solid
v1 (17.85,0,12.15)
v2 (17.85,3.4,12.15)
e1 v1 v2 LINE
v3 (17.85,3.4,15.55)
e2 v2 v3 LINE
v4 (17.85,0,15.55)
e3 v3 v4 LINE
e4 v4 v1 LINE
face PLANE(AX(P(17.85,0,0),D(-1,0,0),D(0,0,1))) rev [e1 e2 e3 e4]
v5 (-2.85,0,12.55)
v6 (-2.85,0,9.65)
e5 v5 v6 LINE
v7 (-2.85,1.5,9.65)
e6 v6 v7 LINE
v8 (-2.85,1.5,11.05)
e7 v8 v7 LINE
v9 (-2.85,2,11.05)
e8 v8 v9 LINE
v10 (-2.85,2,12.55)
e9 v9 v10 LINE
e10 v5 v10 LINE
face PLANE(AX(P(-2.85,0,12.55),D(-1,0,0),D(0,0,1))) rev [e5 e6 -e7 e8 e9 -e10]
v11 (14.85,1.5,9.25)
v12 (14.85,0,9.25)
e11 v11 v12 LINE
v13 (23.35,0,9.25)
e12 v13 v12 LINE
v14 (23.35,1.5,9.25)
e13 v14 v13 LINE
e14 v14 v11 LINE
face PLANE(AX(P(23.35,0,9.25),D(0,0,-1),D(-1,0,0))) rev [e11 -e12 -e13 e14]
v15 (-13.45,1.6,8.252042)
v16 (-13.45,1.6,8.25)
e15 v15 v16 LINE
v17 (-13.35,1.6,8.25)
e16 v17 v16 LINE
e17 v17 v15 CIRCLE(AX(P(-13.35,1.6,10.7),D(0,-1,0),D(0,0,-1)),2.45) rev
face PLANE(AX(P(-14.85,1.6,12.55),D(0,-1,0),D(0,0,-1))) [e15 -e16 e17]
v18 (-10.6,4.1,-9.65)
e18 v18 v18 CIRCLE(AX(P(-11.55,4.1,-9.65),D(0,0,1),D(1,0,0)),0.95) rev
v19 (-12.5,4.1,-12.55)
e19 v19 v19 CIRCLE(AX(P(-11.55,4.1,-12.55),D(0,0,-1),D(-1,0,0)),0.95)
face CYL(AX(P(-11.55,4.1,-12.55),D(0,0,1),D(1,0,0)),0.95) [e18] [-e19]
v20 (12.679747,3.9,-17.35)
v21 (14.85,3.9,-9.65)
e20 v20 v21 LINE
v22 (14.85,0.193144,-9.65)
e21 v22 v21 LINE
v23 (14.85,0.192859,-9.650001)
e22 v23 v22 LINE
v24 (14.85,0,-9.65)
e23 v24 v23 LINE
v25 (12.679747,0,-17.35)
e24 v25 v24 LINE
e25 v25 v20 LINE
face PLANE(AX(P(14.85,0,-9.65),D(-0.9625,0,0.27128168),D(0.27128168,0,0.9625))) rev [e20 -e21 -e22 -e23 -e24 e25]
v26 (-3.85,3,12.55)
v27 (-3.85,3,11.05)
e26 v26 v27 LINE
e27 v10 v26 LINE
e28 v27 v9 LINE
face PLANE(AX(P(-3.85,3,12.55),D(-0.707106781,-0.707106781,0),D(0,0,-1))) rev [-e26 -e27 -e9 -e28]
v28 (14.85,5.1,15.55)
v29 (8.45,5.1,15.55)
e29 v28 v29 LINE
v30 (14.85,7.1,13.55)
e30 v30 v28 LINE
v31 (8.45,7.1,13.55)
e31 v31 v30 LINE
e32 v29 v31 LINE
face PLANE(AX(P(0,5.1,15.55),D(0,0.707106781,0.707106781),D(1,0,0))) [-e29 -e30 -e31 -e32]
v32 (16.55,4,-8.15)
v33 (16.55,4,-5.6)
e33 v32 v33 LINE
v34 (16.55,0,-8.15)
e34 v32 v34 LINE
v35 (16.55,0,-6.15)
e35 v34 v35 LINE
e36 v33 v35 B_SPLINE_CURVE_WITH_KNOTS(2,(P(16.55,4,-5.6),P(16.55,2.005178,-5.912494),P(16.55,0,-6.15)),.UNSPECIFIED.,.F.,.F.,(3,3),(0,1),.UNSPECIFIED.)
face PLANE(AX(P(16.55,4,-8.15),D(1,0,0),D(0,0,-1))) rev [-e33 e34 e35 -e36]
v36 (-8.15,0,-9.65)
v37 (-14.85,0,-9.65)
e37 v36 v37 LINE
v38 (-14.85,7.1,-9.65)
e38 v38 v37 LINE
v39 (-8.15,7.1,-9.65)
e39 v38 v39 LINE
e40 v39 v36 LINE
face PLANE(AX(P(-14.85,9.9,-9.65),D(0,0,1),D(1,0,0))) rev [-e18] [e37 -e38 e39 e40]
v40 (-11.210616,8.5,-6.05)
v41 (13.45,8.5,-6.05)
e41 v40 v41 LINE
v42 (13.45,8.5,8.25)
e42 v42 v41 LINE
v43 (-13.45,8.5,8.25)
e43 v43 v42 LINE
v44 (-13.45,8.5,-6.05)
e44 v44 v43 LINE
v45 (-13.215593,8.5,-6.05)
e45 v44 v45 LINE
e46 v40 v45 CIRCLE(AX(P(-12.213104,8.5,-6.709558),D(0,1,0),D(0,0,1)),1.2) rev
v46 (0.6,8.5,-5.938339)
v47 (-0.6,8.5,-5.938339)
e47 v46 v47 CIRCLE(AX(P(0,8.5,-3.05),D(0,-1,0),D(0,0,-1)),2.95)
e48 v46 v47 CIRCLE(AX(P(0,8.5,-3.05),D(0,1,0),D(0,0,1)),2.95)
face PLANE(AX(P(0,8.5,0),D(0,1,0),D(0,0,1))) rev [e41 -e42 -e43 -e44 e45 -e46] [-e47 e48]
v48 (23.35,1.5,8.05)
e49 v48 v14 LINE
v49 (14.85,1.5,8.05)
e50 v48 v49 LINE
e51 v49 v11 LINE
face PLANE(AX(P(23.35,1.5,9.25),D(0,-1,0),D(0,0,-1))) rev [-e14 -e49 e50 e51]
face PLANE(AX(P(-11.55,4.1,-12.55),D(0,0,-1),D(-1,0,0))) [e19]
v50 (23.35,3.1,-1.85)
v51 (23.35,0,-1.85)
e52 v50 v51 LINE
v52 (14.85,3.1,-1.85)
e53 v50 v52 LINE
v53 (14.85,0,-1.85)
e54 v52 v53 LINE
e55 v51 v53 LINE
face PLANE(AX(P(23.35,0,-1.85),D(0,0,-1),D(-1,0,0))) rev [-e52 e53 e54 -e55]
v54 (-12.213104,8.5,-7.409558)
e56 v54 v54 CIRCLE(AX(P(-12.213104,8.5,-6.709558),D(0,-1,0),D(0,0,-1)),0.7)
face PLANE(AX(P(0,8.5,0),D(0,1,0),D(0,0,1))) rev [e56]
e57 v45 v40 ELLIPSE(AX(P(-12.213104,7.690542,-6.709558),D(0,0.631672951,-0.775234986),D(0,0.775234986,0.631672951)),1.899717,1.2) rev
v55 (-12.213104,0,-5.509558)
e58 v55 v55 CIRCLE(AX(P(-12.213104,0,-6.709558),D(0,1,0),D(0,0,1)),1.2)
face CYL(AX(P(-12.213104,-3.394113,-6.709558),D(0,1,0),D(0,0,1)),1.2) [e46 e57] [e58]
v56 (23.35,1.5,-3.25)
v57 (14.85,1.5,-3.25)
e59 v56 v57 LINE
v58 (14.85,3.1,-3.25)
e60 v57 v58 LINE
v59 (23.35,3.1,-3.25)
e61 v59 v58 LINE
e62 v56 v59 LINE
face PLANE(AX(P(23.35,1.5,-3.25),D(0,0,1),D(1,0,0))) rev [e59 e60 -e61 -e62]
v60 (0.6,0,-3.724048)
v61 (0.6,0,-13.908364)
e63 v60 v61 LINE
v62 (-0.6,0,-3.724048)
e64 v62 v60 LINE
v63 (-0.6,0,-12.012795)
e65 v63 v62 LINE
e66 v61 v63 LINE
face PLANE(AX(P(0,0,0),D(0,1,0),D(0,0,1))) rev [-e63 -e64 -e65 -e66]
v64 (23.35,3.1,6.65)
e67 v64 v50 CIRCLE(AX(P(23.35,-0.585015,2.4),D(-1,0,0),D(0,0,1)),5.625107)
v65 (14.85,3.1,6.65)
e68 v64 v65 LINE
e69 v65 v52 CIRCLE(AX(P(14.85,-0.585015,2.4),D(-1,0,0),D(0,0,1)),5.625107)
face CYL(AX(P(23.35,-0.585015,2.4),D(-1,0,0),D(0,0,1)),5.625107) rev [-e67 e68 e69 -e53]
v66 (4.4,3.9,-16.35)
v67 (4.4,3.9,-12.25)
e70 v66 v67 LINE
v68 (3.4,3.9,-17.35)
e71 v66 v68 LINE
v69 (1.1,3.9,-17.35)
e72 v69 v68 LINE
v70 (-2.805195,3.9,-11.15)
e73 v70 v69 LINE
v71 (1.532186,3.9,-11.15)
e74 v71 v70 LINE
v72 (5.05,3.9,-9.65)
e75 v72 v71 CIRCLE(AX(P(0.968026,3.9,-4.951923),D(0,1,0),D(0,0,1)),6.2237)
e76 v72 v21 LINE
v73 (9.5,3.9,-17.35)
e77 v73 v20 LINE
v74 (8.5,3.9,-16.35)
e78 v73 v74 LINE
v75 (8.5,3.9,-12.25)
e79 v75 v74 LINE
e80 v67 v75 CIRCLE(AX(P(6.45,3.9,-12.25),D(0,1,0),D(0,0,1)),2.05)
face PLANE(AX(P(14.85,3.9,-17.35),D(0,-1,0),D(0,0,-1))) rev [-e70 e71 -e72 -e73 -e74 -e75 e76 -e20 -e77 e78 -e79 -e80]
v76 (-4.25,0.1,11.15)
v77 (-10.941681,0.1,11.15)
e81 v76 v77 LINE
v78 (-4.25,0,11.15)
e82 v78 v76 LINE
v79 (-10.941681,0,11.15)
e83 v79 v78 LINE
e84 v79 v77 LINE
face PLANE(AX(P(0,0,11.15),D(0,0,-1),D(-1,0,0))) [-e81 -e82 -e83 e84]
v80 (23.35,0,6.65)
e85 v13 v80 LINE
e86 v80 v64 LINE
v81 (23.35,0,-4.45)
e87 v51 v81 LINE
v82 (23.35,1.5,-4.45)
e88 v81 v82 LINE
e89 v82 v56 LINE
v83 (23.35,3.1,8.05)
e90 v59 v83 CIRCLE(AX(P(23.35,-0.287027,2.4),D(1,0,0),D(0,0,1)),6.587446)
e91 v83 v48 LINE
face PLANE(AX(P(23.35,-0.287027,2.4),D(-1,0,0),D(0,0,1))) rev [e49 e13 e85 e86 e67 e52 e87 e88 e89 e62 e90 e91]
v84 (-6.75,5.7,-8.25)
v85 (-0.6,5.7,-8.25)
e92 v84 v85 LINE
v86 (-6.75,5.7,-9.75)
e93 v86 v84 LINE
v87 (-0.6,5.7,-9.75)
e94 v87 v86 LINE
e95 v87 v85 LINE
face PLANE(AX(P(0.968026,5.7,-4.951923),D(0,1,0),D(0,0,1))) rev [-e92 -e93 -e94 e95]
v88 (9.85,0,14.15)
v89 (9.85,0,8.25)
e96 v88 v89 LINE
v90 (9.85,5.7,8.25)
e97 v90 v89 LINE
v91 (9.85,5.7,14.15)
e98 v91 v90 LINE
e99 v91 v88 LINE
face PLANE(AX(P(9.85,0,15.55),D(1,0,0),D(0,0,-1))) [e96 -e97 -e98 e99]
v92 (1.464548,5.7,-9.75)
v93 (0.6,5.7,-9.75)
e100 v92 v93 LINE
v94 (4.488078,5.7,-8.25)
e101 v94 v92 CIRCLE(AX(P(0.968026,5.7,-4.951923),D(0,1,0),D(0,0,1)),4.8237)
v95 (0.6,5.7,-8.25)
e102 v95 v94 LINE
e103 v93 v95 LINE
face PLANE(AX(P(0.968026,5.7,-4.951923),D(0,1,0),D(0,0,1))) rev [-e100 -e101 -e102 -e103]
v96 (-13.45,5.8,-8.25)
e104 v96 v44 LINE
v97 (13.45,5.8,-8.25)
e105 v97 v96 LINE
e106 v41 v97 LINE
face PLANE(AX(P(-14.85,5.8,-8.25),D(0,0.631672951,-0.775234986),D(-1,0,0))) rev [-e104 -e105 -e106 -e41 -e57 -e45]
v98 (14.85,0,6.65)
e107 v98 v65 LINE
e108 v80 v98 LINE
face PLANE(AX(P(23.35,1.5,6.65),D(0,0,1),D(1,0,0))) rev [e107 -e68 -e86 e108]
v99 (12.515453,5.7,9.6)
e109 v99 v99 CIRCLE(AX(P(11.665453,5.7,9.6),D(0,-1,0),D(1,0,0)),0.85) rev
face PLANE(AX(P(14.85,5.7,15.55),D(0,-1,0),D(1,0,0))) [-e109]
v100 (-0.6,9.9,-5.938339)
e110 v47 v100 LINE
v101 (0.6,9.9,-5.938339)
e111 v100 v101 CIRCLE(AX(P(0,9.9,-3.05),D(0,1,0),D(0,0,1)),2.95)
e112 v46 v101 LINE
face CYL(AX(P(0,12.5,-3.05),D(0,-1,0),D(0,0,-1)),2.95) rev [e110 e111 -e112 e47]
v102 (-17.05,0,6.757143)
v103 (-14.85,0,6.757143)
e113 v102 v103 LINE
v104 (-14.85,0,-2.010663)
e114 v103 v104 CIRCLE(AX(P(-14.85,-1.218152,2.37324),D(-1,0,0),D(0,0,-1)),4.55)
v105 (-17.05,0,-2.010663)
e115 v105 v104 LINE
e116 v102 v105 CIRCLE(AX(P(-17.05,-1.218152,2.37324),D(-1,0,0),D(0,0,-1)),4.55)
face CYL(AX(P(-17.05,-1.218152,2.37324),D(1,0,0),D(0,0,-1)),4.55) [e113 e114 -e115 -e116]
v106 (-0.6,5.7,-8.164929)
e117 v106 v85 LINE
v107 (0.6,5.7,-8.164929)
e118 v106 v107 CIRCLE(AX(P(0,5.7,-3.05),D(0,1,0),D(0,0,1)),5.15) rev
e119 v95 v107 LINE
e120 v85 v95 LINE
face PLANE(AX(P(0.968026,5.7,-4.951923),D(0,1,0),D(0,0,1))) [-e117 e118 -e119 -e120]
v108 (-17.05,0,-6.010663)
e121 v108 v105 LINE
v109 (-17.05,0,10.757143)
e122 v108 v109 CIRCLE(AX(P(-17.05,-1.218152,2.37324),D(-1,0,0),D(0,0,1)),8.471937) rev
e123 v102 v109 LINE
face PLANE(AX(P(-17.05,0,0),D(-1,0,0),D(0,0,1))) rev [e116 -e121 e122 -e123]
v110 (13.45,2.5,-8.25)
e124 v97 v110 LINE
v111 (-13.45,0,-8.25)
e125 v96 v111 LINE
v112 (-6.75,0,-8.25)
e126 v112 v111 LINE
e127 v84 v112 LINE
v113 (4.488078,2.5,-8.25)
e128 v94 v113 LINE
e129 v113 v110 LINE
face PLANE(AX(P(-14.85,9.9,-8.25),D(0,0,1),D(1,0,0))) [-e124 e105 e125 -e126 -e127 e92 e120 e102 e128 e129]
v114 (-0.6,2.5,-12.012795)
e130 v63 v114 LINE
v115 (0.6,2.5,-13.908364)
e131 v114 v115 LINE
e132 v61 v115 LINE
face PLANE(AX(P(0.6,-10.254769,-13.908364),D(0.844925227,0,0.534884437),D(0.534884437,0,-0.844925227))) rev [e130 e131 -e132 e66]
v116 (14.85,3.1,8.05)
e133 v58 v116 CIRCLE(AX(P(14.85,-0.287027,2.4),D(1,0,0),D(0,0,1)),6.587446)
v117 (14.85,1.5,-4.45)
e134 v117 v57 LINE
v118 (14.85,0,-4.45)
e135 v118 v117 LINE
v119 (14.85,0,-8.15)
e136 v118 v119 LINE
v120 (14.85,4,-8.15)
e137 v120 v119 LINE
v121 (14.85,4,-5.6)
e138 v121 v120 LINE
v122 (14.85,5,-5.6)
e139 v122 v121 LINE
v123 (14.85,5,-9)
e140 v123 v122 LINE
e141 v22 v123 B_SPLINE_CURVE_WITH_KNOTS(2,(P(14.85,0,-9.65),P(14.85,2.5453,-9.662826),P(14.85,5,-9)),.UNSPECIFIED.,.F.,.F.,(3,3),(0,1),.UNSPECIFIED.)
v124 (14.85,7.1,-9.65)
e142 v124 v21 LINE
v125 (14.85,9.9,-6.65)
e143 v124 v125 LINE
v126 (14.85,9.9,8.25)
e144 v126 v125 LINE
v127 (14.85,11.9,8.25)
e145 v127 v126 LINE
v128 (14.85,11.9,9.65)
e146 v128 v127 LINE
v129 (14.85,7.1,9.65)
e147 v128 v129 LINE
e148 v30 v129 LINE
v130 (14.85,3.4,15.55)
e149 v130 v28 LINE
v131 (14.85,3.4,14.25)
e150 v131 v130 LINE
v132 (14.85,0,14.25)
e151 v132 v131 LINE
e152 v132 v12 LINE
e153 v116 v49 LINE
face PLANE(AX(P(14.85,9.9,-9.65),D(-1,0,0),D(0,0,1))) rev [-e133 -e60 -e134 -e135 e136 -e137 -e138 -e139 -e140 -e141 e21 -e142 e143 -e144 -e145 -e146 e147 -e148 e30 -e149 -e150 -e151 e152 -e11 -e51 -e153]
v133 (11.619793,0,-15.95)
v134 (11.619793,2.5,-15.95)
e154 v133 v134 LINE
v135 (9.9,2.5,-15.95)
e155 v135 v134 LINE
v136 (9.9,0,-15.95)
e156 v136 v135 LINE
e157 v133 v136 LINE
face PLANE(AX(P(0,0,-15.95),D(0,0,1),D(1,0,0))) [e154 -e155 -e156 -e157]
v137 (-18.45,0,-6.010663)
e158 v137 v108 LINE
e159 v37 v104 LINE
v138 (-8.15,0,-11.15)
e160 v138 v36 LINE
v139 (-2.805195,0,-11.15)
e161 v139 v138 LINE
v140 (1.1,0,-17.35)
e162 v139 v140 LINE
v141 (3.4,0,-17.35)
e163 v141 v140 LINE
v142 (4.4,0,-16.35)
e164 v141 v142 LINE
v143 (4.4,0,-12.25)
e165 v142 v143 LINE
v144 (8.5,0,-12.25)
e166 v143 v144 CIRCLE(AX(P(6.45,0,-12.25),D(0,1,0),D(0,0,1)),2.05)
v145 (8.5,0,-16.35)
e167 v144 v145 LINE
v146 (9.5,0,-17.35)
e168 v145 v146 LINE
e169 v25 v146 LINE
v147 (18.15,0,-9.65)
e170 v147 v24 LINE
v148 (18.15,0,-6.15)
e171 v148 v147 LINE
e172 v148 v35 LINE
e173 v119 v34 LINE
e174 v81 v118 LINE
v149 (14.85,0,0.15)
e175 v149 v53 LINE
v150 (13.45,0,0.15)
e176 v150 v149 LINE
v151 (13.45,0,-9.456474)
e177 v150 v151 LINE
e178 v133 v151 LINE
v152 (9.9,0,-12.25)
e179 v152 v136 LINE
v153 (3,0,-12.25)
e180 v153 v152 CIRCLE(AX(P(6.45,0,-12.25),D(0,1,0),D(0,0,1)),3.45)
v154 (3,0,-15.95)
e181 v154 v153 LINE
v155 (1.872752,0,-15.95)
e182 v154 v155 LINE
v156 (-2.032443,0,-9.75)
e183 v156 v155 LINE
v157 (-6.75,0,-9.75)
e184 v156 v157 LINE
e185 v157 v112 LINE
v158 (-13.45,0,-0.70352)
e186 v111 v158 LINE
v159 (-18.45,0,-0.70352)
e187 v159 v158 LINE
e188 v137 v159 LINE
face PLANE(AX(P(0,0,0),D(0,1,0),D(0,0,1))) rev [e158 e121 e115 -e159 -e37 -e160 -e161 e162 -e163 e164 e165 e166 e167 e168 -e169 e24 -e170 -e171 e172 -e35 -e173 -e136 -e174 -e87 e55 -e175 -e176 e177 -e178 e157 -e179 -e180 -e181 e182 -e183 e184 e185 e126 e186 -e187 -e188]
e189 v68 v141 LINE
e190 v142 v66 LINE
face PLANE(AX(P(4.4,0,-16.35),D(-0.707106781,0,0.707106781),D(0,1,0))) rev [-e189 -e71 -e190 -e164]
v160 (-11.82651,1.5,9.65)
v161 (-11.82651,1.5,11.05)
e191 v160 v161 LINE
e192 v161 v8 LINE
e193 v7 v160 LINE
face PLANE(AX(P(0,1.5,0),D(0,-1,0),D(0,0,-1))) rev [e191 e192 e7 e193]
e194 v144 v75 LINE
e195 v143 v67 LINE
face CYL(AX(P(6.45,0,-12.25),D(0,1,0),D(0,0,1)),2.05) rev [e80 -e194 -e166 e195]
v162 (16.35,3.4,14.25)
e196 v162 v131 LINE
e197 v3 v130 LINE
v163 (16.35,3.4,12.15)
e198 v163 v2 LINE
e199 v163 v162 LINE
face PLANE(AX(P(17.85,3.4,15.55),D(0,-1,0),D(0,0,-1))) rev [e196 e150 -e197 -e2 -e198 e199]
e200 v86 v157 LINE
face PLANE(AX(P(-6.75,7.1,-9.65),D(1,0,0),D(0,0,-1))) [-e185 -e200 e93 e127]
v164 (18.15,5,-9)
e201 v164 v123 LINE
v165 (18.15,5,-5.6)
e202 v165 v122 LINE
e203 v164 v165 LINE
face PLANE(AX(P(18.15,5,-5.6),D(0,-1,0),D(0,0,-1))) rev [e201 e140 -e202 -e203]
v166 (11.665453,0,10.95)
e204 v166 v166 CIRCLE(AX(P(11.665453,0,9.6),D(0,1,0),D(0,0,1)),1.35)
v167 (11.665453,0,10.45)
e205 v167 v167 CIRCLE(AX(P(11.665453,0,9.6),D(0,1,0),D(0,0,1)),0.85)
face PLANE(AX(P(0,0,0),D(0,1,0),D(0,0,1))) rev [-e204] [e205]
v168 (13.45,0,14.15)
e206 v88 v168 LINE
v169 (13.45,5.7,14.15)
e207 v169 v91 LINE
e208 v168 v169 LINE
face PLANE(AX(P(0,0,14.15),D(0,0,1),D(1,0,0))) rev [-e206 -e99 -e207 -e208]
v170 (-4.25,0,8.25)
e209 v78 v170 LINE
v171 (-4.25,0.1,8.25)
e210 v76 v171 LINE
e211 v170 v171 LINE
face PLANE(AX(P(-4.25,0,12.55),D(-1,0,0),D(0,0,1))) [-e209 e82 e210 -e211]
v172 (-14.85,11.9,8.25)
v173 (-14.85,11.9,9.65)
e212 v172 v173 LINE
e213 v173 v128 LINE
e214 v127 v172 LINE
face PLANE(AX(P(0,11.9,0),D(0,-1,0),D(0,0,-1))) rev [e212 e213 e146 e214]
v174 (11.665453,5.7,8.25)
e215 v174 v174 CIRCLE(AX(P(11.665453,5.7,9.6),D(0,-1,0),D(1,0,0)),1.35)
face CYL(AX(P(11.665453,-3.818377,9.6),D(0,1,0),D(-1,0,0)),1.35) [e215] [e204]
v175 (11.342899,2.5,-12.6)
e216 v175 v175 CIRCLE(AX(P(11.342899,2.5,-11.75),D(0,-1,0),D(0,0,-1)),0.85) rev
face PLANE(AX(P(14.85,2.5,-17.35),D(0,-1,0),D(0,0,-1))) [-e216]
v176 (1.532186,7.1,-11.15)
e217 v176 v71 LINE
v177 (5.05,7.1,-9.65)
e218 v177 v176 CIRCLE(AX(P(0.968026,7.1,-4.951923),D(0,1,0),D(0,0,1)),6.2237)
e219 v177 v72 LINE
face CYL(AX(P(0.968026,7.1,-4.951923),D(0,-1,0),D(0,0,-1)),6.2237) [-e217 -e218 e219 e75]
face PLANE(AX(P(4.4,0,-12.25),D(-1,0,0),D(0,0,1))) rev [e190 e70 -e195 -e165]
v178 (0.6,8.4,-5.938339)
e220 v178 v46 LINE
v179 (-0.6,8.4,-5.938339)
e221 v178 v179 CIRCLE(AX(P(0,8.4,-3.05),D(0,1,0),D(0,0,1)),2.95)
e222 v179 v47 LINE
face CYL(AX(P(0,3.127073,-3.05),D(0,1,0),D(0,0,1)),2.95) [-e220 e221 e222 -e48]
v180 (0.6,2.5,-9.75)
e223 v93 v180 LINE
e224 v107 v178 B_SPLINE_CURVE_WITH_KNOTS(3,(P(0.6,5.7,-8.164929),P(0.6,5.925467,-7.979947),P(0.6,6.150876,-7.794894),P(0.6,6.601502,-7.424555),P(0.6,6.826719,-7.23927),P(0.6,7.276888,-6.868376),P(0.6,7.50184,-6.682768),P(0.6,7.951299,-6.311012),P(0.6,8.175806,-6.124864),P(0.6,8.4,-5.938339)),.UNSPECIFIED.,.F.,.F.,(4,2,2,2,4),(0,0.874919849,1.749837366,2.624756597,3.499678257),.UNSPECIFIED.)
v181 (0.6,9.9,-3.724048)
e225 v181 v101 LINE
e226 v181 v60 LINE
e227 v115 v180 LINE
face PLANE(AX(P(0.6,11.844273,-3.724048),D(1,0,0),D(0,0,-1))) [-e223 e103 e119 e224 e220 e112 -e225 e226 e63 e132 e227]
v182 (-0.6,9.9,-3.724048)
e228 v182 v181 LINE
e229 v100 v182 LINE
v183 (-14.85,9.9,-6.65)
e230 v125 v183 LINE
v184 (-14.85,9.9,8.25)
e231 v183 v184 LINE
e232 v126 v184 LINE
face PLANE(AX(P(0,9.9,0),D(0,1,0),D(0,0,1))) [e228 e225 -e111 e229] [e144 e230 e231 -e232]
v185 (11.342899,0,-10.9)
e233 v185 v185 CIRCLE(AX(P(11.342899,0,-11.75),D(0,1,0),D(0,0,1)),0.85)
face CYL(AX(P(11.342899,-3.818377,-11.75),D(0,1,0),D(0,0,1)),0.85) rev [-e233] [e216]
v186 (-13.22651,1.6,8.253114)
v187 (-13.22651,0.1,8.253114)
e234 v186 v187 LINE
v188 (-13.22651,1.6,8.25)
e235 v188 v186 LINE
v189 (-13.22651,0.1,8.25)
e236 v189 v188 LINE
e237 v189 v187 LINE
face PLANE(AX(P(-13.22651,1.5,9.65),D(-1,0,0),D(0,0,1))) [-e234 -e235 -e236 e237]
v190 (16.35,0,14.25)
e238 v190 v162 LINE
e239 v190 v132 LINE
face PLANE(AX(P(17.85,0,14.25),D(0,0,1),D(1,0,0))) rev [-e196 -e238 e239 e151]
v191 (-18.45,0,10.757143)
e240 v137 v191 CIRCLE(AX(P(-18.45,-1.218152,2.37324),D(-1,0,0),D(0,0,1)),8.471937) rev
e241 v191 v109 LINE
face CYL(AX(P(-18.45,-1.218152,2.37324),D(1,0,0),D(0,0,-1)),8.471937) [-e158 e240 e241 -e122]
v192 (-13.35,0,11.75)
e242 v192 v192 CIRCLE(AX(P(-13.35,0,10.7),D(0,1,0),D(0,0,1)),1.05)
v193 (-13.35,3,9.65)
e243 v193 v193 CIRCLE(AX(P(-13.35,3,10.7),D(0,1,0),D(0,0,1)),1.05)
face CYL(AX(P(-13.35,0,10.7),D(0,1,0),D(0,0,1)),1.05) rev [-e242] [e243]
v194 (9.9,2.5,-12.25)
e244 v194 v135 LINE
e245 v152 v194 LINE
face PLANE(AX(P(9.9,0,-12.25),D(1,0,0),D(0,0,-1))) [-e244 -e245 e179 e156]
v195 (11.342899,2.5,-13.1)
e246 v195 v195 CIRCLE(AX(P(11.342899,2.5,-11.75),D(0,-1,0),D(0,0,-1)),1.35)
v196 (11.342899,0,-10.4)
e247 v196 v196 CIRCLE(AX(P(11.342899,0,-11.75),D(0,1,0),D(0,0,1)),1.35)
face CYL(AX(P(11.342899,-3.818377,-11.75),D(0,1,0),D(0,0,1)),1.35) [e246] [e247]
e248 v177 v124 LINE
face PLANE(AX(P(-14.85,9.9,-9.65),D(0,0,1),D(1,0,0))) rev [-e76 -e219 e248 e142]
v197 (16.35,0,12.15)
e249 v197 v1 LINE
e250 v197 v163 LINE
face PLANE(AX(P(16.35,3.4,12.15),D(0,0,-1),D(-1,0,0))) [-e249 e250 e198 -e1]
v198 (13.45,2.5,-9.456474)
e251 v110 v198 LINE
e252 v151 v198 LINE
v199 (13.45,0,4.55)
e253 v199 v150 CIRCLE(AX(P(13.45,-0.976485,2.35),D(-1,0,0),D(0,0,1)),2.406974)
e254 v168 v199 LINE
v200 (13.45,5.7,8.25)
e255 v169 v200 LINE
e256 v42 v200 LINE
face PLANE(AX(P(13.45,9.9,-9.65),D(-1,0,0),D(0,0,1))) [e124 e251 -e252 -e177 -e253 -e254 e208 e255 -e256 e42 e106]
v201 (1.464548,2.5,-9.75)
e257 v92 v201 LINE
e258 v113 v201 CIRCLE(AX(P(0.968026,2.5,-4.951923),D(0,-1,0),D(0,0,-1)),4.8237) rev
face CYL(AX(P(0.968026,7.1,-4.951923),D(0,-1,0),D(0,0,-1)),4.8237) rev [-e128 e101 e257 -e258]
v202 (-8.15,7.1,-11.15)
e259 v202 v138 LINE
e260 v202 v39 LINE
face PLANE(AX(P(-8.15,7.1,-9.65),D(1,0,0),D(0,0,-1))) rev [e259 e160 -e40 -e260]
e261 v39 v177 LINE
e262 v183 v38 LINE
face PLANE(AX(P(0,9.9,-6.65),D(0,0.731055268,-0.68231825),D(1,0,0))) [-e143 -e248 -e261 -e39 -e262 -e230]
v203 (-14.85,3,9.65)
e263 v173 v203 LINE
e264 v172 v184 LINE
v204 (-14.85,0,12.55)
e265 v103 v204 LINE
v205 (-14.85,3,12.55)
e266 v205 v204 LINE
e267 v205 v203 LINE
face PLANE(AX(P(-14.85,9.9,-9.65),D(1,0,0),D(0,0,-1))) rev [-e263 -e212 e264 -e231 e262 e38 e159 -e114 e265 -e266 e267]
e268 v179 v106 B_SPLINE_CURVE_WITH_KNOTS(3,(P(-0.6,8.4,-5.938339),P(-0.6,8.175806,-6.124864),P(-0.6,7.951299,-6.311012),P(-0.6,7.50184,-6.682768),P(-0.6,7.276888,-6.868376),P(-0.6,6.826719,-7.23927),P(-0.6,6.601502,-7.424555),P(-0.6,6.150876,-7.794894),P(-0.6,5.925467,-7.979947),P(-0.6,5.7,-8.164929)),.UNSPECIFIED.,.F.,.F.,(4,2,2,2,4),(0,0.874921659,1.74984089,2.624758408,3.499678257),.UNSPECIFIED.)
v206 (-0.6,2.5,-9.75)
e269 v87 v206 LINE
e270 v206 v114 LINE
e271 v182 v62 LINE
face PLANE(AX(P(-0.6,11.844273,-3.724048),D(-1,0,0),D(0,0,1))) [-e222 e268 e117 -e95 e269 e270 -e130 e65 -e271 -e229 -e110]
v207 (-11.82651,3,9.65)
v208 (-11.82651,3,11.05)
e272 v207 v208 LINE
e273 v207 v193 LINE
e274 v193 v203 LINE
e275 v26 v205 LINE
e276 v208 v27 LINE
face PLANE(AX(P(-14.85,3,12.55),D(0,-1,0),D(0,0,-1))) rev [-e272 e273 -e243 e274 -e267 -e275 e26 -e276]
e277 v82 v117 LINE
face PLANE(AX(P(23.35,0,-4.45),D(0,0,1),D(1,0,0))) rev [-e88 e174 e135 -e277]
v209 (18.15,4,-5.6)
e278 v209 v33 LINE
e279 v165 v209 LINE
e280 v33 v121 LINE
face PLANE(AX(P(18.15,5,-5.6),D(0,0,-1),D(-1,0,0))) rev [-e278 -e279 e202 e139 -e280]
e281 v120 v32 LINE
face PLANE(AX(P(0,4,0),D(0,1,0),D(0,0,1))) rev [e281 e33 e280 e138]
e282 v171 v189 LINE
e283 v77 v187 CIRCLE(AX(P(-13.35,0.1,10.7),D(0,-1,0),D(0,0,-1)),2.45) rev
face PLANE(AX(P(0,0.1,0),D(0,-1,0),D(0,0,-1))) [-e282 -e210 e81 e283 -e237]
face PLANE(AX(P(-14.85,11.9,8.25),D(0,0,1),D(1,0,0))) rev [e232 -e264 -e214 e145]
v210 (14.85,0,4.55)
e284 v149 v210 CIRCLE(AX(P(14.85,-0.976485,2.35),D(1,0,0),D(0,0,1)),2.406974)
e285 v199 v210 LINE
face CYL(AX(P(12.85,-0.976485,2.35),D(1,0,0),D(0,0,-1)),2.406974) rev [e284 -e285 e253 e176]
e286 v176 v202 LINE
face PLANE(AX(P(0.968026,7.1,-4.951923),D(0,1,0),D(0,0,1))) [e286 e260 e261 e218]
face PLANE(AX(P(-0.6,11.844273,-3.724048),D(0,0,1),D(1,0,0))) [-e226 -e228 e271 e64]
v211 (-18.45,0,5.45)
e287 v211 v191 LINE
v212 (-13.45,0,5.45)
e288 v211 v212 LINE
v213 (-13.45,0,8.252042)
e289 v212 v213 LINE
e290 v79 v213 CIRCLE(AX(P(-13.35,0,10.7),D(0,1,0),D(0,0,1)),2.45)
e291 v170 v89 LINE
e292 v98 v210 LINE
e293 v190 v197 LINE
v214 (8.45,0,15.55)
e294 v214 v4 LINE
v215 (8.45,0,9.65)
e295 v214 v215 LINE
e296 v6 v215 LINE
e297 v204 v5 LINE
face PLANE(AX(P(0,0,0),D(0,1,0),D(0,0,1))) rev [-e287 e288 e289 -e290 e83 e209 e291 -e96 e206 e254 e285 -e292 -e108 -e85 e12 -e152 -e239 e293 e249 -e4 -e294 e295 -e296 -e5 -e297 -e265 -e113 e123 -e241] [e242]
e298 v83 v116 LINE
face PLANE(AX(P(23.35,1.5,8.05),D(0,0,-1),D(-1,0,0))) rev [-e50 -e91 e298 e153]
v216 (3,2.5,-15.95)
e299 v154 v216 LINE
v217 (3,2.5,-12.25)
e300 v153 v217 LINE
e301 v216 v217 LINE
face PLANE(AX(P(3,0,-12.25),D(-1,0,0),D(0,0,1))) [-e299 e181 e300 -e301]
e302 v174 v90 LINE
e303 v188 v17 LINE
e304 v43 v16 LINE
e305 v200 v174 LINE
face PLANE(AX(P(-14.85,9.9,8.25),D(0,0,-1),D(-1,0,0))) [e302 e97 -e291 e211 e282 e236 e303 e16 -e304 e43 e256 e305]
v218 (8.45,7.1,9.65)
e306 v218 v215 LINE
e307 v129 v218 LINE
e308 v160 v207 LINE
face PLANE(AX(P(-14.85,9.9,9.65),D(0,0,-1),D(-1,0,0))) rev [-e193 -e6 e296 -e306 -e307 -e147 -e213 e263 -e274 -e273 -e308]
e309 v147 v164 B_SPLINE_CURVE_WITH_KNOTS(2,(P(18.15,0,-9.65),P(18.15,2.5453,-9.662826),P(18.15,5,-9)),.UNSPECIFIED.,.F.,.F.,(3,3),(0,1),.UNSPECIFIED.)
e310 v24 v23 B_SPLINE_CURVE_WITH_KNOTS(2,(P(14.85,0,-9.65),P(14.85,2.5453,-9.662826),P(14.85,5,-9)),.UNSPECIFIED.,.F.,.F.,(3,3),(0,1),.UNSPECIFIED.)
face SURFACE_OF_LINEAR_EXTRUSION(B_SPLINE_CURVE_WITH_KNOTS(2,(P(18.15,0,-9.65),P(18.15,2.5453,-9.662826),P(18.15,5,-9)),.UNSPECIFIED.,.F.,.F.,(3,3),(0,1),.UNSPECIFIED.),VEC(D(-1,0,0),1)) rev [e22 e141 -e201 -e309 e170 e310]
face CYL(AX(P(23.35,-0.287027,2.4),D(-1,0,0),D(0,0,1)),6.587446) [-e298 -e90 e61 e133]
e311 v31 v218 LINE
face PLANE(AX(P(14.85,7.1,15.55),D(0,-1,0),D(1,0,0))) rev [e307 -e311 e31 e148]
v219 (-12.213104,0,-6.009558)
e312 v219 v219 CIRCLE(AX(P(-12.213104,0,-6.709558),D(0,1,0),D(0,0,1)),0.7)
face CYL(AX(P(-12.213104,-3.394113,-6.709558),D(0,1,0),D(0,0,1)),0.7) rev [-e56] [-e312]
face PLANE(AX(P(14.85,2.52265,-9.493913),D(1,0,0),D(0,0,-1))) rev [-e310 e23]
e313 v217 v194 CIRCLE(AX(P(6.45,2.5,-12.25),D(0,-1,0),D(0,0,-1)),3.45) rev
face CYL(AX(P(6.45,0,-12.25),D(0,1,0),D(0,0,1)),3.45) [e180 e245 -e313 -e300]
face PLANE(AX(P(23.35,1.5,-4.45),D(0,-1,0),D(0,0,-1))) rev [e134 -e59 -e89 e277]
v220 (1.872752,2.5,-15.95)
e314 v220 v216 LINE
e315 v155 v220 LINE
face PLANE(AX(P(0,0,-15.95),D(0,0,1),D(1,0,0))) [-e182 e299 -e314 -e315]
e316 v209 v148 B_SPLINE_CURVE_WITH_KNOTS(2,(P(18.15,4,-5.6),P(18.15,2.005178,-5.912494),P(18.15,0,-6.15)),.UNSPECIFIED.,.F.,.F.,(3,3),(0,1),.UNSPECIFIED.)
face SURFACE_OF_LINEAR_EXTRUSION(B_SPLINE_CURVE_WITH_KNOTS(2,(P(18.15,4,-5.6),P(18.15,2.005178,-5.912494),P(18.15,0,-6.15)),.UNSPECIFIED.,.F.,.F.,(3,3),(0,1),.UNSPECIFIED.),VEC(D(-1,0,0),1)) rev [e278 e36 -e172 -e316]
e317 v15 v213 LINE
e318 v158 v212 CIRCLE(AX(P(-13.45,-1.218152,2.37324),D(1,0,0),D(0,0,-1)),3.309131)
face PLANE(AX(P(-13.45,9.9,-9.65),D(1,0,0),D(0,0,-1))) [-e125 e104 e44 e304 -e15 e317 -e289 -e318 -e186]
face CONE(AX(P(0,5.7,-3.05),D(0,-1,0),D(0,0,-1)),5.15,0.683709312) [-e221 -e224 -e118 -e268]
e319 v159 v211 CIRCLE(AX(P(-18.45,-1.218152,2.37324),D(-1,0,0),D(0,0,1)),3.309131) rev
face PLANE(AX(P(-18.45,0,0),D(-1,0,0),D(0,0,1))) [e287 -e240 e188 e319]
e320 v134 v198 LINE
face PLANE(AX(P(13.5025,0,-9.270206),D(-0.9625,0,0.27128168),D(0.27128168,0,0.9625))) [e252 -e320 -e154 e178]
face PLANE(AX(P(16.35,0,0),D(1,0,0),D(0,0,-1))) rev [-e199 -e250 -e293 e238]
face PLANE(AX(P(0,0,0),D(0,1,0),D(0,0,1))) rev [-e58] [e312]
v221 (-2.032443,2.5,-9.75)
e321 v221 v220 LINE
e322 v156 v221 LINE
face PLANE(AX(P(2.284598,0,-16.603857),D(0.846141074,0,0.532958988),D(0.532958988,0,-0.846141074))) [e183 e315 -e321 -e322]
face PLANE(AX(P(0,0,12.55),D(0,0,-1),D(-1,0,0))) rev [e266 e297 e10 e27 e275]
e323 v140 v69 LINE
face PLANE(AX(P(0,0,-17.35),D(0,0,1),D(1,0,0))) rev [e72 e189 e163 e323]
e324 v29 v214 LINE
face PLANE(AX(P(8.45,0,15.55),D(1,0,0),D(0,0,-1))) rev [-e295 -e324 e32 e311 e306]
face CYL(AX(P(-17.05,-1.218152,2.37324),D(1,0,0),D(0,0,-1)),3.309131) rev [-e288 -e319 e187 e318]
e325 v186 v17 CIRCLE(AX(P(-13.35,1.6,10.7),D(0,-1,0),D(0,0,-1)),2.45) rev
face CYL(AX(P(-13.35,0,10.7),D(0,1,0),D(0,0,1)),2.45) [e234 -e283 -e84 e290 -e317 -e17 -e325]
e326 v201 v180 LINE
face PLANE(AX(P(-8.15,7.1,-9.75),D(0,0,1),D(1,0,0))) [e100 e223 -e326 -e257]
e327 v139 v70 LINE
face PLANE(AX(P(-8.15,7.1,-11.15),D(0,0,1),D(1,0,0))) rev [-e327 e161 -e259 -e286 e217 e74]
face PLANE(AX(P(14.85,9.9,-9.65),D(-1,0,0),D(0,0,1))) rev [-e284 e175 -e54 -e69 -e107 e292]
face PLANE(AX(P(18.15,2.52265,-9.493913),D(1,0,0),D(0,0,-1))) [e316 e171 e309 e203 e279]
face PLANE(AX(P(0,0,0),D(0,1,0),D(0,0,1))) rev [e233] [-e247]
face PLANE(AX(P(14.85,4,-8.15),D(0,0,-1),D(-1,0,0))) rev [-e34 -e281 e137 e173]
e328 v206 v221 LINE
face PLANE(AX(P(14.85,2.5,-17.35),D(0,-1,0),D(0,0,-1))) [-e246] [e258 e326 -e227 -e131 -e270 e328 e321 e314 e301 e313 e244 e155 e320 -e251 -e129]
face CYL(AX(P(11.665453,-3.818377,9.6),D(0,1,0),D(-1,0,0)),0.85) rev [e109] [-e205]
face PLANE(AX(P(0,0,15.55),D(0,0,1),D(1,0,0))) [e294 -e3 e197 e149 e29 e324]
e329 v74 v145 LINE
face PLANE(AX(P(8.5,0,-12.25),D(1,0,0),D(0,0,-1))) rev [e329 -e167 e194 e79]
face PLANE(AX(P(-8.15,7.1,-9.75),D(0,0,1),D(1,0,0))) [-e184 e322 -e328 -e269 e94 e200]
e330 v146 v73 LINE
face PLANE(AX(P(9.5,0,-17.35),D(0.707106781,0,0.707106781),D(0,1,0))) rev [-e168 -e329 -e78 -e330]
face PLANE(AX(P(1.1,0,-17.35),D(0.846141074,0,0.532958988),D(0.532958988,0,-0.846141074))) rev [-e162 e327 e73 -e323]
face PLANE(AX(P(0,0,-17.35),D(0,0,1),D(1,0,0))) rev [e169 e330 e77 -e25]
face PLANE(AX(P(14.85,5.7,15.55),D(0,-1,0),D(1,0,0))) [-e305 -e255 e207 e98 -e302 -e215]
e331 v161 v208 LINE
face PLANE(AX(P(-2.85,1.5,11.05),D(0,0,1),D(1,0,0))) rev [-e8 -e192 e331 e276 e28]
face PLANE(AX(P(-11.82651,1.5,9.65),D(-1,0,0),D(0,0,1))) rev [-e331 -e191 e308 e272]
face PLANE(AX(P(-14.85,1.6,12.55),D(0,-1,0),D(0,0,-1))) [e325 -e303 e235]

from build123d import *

# Parameters (mm, degrees)
SKETCH1_W            = 29.7
SKETCH1_H            = 19.3
BOSS_EXTRUDE1_DEPTH  = 9.9
SKETCH2_W            = 23.1
SKETCH2_H            = 3.9
BOSS_EXTRUDE3_DEPTH  = 7.7
CUT_EXTRUDE1_DEPTH   = 24.612390815
BOSS_EXTRUDE4_DEPTH  = 3.2
BOSS_EXTRUDE5_DEPTH  = 3.9
SKETCH7_R            = 0.95
BOSS_EXTRUDE6_DEPTH  = 2.9
BOSS_EXTRUDE8_DEPTH  = 8.5
SKETCH10_W           = 12
SKETCH10_H           = 3
BOSS_EXTRUDE9_DEPTH  = 2.9
SKETCH11_W           = 8.976509782
SKETCH11_H           = 1.4
CUT_EXTRUDE2_DEPTH   = 1.5
SKETCH14_R           = 1.05
CUT_EXTRUDE3_DEPTH   = 30.897407914
SKETCH15_W           = 6.4
SKETCH15_H           = 7.1
BOSS_EXTRUDE10_DEPTH = 5.9
SKETCH16_W           = 1.3
SKETCH16_H           = 3.4
BOSS_EXTRUDE11_DEPTH = 3
SKETCH17_W           = 3.4
SKETCH17_H           = 3.4
BOSS_EXTRUDE12_DEPTH = 1.5
BOSS_EXTRUDE13_DEPTH = 2.2
BOSS_EXTRUDE15_DEPTH = 1.4
SKETCH21_W           = 29.7
SKETCH21_H           = 1.4
BOSS_EXTRUDE16_DEPTH = 2
SHELL1_OUTLINE_W     = 26.9
SHELL1_OUTLINE_H     = 16.5
SHELL1_DEPTH         = 8.5
SHELL1_2_OUTLINE_W   = 3.6
SHELL1_2_OUTLINE_H   = 5.9
SHELL1_2_DEPTH       = 2.5
SHELL1_START         = 2.5
SHELL1_3_OUTLINE_W   = 3.6
SHELL1_3_OUTLINE_H   = 5.9
SHELL1_3_DEPTH       = 3.2
SHELL1_4_DEPTH       = 0.1
SHELL1_START_2       = 0.1
SHELL1_5_DEPTH       = 1.5
CUT_EXTRUDE5_START   = -2
CUT_EXTRUDE5_DEPTH   = 2
CUT_EXTRUDE6_DEPTH   = 2
BOSS_EXTRUDE17_DEPTH = 3.3
SKETCH26_W           = 1.7
SKETCH26_H           = 3.040173169
CUT_EXTRUDE8_DEPTH   = 4
SKETCH32_R           = 1.35
SKETCH32_R_2         = 0.85
BOSS_EXTRUDE22_DEPTH = 5.7
SKETCH33_R           = 1.35
SKETCH33_R_2         = 0.85
BOSS_EXTRUDE23_DEPTH = 2.5
SKETCH34_R           = 1.2
SKETCH34_R_2         = 0.7
BOSS_EXTRUDE24_DEPTH = 8.5
SKETCH35_R           = 2.95
CUT_EXTRUDE9_DEPTH   = 4
CHAMFER1_SIZE2       = 3
CHAMFER1_SIZE        = 2.8
CHAMFER2_SIZE        = 1
CHAMFER3_SIZE        = 1
CHAMFER4_SIZE        = 2
SKETCH36_W           = 1.2
SKETCH36_H           = 6.025951521
BOSS_EXTRUDE25_DEPTH = 3.2
BOSS_EXTRUDE33_START = -4.2
BOSS_EXTRUDE33_DEPTH = 4.2
BOSS_EXTRUDE36_DEPTH = 2.5
CHAMFER5_SIZE        = 2.2
CHAMFER5_SIZE_2      = 2.7
CHAMFER6_SIZE        = 2.7
CHAMFER6_SIZE2       = 2.2


with BuildPart() as part:
    # Sketch1 → Boss-Extrude1 (new body)
    with BuildSketch(Plane(origin=(0, 0, 0), x_dir=(1, 0, 0), z_dir=(0, 1, 0))):
        Rectangle(SKETCH1_W, SKETCH1_H)
    extrude(amount=BOSS_EXTRUDE1_DEPTH)

    # Sketch2 → Boss-Extrude3 (add)
    with BuildSketch(Plane(origin=(0, 0, -9.65), x_dir=(-1, 0, 0), z_dir=(0, 0, -1))):
        with Locations((-3.3, 1.95)):
            Rectangle(SKETCH2_W, SKETCH2_H)
    extrude(amount=BOSS_EXTRUDE3_DEPTH)

    # Sketch4 → Cut-Extrude1 (cut, through all)
    with BuildSketch(Plane(origin=(0, 3.9, 0), x_dir=(1, 0, 0), z_dir=(0, 1, 0))):
        with BuildLine():
            Line((8.5, 12.25), (8.5, 17.35))
            Line((8.5, 17.35), (4.4, 17.35))
            Line((4.4, 17.35), (4.4, 12.25))
            ThreePointArc((4.4, 12.25), (6.45, 10.2), (8.5, 12.25))
        make_face()
        Polygon((14.85, 9.65), (12.679746559, 17.35), (14.85, 17.35), align=None)
        Polygon((1.1, 17.35), (-3.75, 9.65), (-8.25, 9.65), (-8.25, 17.35), align=None)
    extrude(amount=-CUT_EXTRUDE1_DEPTH, mode=Mode.SUBTRACT)

    # Sketch5 → Boss-Extrude4 (add)
    with BuildSketch(Plane(origin=(0, 3.9, 0), x_dir=(1, 0, 0), z_dir=(0, 1, 0))):
        with BuildLine():
            Line((-8.15, 9.65), (5.05, 9.65))
            ThreePointArc((5.05, 9.65), (3.409161026, 10.676894337), (1.53218592, 11.15))
            Line((1.53218592, 11.15), (-8.15, 11.15))
            Line((-8.15, 11.15), (-8.15, 9.65))
        make_face()
    extrude(amount=BOSS_EXTRUDE4_DEPTH)

    # Sketch6 → Boss-Extrude5 (add)
    with BuildSketch(Plane.XZ.offset(-3.9)):
        Polygon((-8.15, -9.65), (-8.15, -11.15), (-2.805194805, -11.15), (-3.75, -9.65), align=None)
    extrude(amount=BOSS_EXTRUDE5_DEPTH)

    # Sketch7 → Boss-Extrude6 (add)
    with BuildSketch(Plane(origin=(0, 0, -9.65), x_dir=(-1, 0, 0), z_dir=(0, 0, -1))):
        with Locations(Location((11.55, 4.1, 0), (0, 0, 180))):
            Circle(SKETCH7_R)
    extrude(amount=BOSS_EXTRUDE6_DEPTH)

    # Sketch8 → Boss-Extrude8 (add)
    with BuildSketch(Plane(origin=(14.85, 0, 0), x_dir=(0, 0, -1), z_dir=(1, 0, 0))):
        with BuildLine():
            Line((4.45, 0), (1.85, 0))
            Line((1.85, 0), (1.85, 1.5))
            Line((1.85, 1.5), (1.85, 3.1))
            ThreePointArc((1.85, 3.1), (-2.4, 5.040092727), (-6.65, 3.1))
            Line((-6.65, 3.1), (-6.65, 1.5))
            Line((-6.65, 1.5), (-6.65, 0))
            Line((-6.65, 0), (-9.25, 0))
            Line((-9.25, 0), (-9.25, 1.5))
            Line((-9.25, 1.5), (-8.05, 1.5))
            Line((-8.05, 1.5), (-8.05, 3.1))
            ThreePointArc((-8.05, 3.1), (-2.4, 6.300419583), (3.25, 3.1))
            Line((3.25, 3.1), (3.25, 1.5))
            Line((3.25, 1.5), (4.45, 1.5))
            Line((4.45, 1.5), (4.45, 0))
        make_face()
    extrude(amount=BOSS_EXTRUDE8_DEPTH)

    # Sketch10 → Boss-Extrude9 (add)
    with BuildSketch(Plane.XY.offset(9.65)):
        with Locations((-8.85, 1.5)):
            Rectangle(SKETCH10_W, SKETCH10_H)
    extrude(amount=BOSS_EXTRUDE9_DEPTH)

    # Sketch11 → Cut-Extrude2 (cut)
    with BuildSketch(Plane(origin=(0, 3, 0), x_dir=(1, 0, 0), z_dir=(0, 1, 0))):
        with Locations((-7.338254891, -10.35)):
            Rectangle(SKETCH11_W, SKETCH11_H)
    extrude(amount=-CUT_EXTRUDE2_DEPTH, mode=Mode.SUBTRACT)

    # Sketch14 → Cut-Extrude3 (cut, through all)
    with BuildSketch(Plane(origin=(0, 3, 0), x_dir=(1, 0, 0), z_dir=(0, 1, 0))):
        with Locations(Location((-13.35, -10.7, 0), (0, 0, 270))):
            Circle(SKETCH14_R)
    extrude(amount=-CUT_EXTRUDE3_DEPTH, mode=Mode.SUBTRACT)

    # Sketch15 → Boss-Extrude10 (add)
    with BuildSketch(Plane.XY.offset(9.65)):
        with Locations((11.65, 3.55)):
            Rectangle(SKETCH15_W, SKETCH15_H)
    extrude(amount=BOSS_EXTRUDE10_DEPTH)

    # Sketch16 → Boss-Extrude11 (add)
    with BuildSketch(Plane(origin=(14.85, 0, 0), x_dir=(0, 0, -1), z_dir=(1, 0, 0))):
        with Locations((-14.9, 1.7)):
            Rectangle(SKETCH16_W, SKETCH16_H)
    extrude(amount=BOSS_EXTRUDE11_DEPTH)

    # Sketch17 → Boss-Extrude12 (add)
    with BuildSketch(Plane(origin=(17.85, 0, 0), x_dir=(0, 0, -1), z_dir=(1, 0, 0))):
        with Locations((-13.85, 1.7)):
            Rectangle(SKETCH17_W, SKETCH17_H)
    extrude(amount=-BOSS_EXTRUDE12_DEPTH)

    # Sketch19 → Boss-Extrude13 (add)
    with BuildSketch(Plane.ZY.offset(14.85)):
        with BuildLine():
            Line((-2.010663216, 0), (-0.703520417, 0))
            ThreePointArc((-0.703520417, 0), (2.373239791, 2.090978922), (5.45, 0))
            Line((5.45, 0), (6.757142799, 0))
            ThreePointArc((6.757142799, 0), (2.373239791, 3.331847949), (-2.010663216, 0))
        make_face()
    extrude(amount=BOSS_EXTRUDE13_DEPTH)

    # Sketch20 → Boss-Extrude15 (add)
    with BuildSketch(Plane.ZY.offset(17.05)):
        with BuildLine():
            ThreePointArc((10.757142799, 0), (2.373239791, 7.253785393), (-6.010663216, 0))
            Line((-6.010663216, 0), (-2.010663216, 0))
            Line((-2.010663216, 0), (-0.703520417, 0))
            ThreePointArc((-0.703520417, 0), (2.373239791, 2.090978922), (5.45, 0))
            Line((5.45, 0), (6.757142799, 0))
            Line((6.757142799, 0), (10.757142799, 0))
        make_face()
    extrude(amount=BOSS_EXTRUDE15_DEPTH)

    # Sketch21 → Boss-Extrude16 (add)
    with BuildSketch(Plane(origin=(0, 9.9, 0), x_dir=(1, 0, 0), z_dir=(0, 1, 0))):
        with Locations((0, -8.95)):
            Rectangle(SKETCH21_W, SKETCH21_H)
    extrude(amount=BOSS_EXTRUDE16_DEPTH)

    # Shell1: read off the stored shape, not the designer's step
    # Shell1 outline → Shell1 (cut)
    with BuildSketch(Plane(origin=(0, 0, 0), x_dir=(1, 0, 0), z_dir=(0, 1, 0))):
        Rectangle(SHELL1_OUTLINE_W, SHELL1_OUTLINE_H)
    extrude(amount=SHELL1_DEPTH, mode=Mode.SUBTRACT)

    # Shell1 2 outline → Shell1 2 (cut)
    with BuildSketch(Plane(origin=(0, 0, 0), x_dir=(1, 0, 0), z_dir=(0, 1, 0))):
        with Locations((11.65, -11.2)):
            Rectangle(SHELL1_2_OUTLINE_W, SHELL1_2_OUTLINE_H)
        with BuildLine():
            Line((13.45, 8.25), (13.45, 9.456474215))
            Line((13.45, 9.456474215), (11.619792639, 15.95))
            Line((11.619792639, 15.95), (9.9, 15.95))
            Line((9.9, 15.95), (9.9, 12.25))
            ThreePointArc((9.9, 12.25), (6.45, 8.8), (3, 12.25))
            Line((3, 12.25), (3, 15.95))
            Line((3, 15.95), (1.872752248, 15.95))
            Line((1.872752248, 15.95), (-2.032442558, 9.75))
            Line((-2.032442558, 9.75), (-6.75, 9.75))
            Line((-6.75, 9.75), (-6.75, 8.25))
            Line((-6.75, 8.25), (13.45, 8.25))
        make_face()
    extrude(amount=SHELL1_2_DEPTH, mode=Mode.SUBTRACT)

    # Shell1 3 outline → Shell1 3 (cut)
    with BuildSketch(Plane(origin=(0, 0, 0), x_dir=(1, 0, 0), z_dir=(0, 1, 0)).offset(SHELL1_START)):
        with Locations((11.65, -11.2)):
            Rectangle(SHELL1_3_OUTLINE_W, SHELL1_3_OUTLINE_H)
        with BuildLine():
            Line((-6.75, 8.25), (4.488078335, 8.25))
            ThreePointArc((4.488078335, 8.25), (3.111788225, 9.273075846), (1.464547501, 9.75))
            Line((1.464547501, 9.75), (-6.75, 9.75))
            Line((-6.75, 9.75), (-6.75, 8.25))
        make_face()
    extrude(amount=SHELL1_3_DEPTH, mode=Mode.SUBTRACT)

    # Shell1 4 outline → Shell1 4 (cut)
    with BuildSketch(Plane(origin=(0, 0, 0), x_dir=(1, 0, 0), z_dir=(0, 1, 0))):
        with BuildLine():
            Line((-4.25, -11.15), (-4.25, -8.25))
            Line((-4.25, -8.25), (-13.35, -8.25))
            ThreePointArc((-13.35, -8.25), (-11.465192318, -9.134752416), (-10.941681084, -11.15))
            Line((-10.941681084, -11.15), (-4.25, -11.15))
        make_face()
        with BuildLine():
            ThreePointArc((-13.45, -8.252041667), (-13.40001042, -8.25051047), (-13.35, -8.25))
            Line((-13.35, -8.25), (-13.45, -8.25))
            Line((-13.45, -8.25), (-13.45, -8.252041667))
        make_face()
    extrude(amount=SHELL1_4_DEPTH, mode=Mode.SUBTRACT)

    # Shell1 5 outline → Shell1 5 (cut)
    with BuildSketch(Plane(origin=(0, 0, 0), x_dir=(1, 0, 0), z_dir=(0, 1, 0)).offset(SHELL1_START_2)):
        with BuildLine():
            Line((-13.226509782, -8.25311419), (-13.226509782, -8.25))
            Line((-13.226509782, -8.25), (-13.35, -8.25))
            ThreePointArc((-13.35, -8.25), (-13.288235261, -8.250778671), (-13.226509782, -8.25311419))
        make_face()
        with BuildLine():
            ThreePointArc((-13.45, -8.252041667), (-13.40001042, -8.25051047), (-13.35, -8.25))
            Line((-13.35, -8.25), (-13.45, -8.25))
            Line((-13.45, -8.25), (-13.45, -8.252041667))
        make_face()
    extrude(amount=SHELL1_5_DEPTH, mode=Mode.SUBTRACT)

    # Sketch23 → Cut-Extrude5 (cut)
    with BuildSketch(Plane.ZY.offset(14.85).offset(CUT_EXTRUDE5_START)):
        with BuildLine():
            Line((-0.703520417, 0), (5.45, 0))
            ThreePointArc((5.45, 0), (2.373239791, 2.090978922), (-0.703520417, 0))
        make_face()
    extrude(amount=CUT_EXTRUDE5_DEPTH, mode=Mode.SUBTRACT)

    # Sketch24 → Cut-Extrude6 (cut)
    with BuildSketch(Plane(origin=(14.85, 0, 0), x_dir=(0, 0, -1), z_dir=(1, 0, 0))):
        with BuildLine():
            Line((-4.55, 0), (-0.15, 0))
            ThreePointArc((-0.15, 0), (-2.35, 1.430488878), (-4.55, 0))
        make_face()
    extrude(amount=-CUT_EXTRUDE6_DEPTH, mode=Mode.SUBTRACT)

    # Sketch25 → Boss-Extrude17 (add)
    with BuildSketch(Plane(origin=(14.85, 0, 0), x_dir=(0, 0, -1), z_dir=(1, 0, 0))):
        with BuildLine():
            Line((9.65, 0), (6.15, 0))
            add(Edge.make_bspline(
                [(5.6, 4), (5.912494259, 2.005178445), (6.15, 0)],
                knots=[0, 0, 0, 1, 1, 1], degree=2))
            Line((5.6, 4), (5.6, 5))
            Line((5.6, 5), (9, 5))
            add(Edge.make_bspline(
                [(9, 5), (9.662826285, 2.545299606), (9.65, 0)],
                knots=[0, 0, 0, 1, 1, 1], degree=2))
        make_face()
    extrude(amount=BOSS_EXTRUDE17_DEPTH)

    # Sketch26 → Cut-Extrude8 (cut)
    with BuildSketch(Plane.XZ):
        with Locations((15.7, -6.629913416)):
            Rectangle(SKETCH26_W, SKETCH26_H)
    extrude(amount=-CUT_EXTRUDE8_DEPTH, mode=Mode.SUBTRACT)

    # Sketch32 → Boss-Extrude22 (add)
    with BuildSketch(Plane.XZ.offset(-5.7)):
        with Locations(Location((11.665452924, 9.6, 0), (0, 0, 90))):
            Circle(SKETCH32_R)
        with Locations(Location((11.665452924, 9.6, 0), (0, 0, 90))):
            Circle(SKETCH32_R_2, mode=Mode.SUBTRACT)
    extrude(amount=BOSS_EXTRUDE22_DEPTH)

    # Sketch33 → Boss-Extrude23 (add)
    with BuildSketch(Plane.XZ.offset(-2.5)):
        with Locations(Location((11.342898785, -11.75, 0), (0, 0, 90))):
            Circle(SKETCH33_R)
        with Locations(Location((11.342898785, -11.75, 0), (0, 0, 90))):
            Circle(SKETCH33_R_2, mode=Mode.SUBTRACT)
    extrude(amount=BOSS_EXTRUDE23_DEPTH)

    # Sketch34 → Boss-Extrude24 (add)
    with BuildSketch(Plane.XZ.offset(-8.5)):
        with Locations(Location((-12.21310403, -6.709558041, 0), (0, 0, 90))):
            Circle(SKETCH34_R)
        with Locations(Location((-12.21310403, -6.709558041, 0), (0, 0, 90))):
            Circle(SKETCH34_R_2, mode=Mode.SUBTRACT)
    extrude(amount=BOSS_EXTRUDE24_DEPTH)

    # Sketch35 → Cut-Extrude9 (cut)
    with BuildSketch(Plane.XZ.offset(-8.5)):
        with Locations(Location((0, -3.05, 0), (0, 0, 270))):
            Circle(SKETCH35_R)
    extrude(amount=-CUT_EXTRUDE9_DEPTH, mode=Mode.SUBTRACT)

    # Chamfer1
    chamfer1_edges = [part.edges().sort_by_distance(p)[0] for p in [
        (0, 9.9, -9.65),
    ]]
    chamfer1_side = [part.faces().sort_by_distance(p)[0] for p in [
        (0, 9.844, -9.65),
    ]]
    chamfer(chamfer1_edges, length=CHAMFER1_SIZE - 0.0001, length2=CHAMFER1_SIZE2 - 0.0001, reference=chamfer1_side[0])  # a hair under: the kernel refuses the full size

    # Chamfer2
    chamfer2_edges = [part.edges().sort_by_distance(p)[0] for p in [
        (4.4, 1.95, -17.35),
        (8.5, 1.95, -17.35),
    ]]
    chamfer(chamfer2_edges, length=CHAMFER2_SIZE)

    # Chamfer3
    chamfer3_edges = [part.edges().sort_by_distance(p)[0] for p in [
        (-2.85, 3, 11.8),
    ]]
    chamfer(chamfer3_edges, length=CHAMFER3_SIZE)

    # Chamfer4
    chamfer4_edges = [part.edges().sort_by_distance(p)[0] for p in [
        (11.65, 7.1, 15.55),
    ]]
    chamfer(chamfer4_edges, length=CHAMFER4_SIZE)

    # Sketch36 → Boss-Extrude25 (add)
    with BuildSketch(Plane.XZ.offset(-2.5)):
        with Locations((0, -6.73702424)):
            Rectangle(SKETCH36_W, SKETCH36_H)
    extrude(amount=-BOSS_EXTRUDE25_DEPTH)

    # Sketch39 → Boss-Extrude33 (add)
    with BuildSketch(Plane(origin=(0, 9.9, 0), x_dir=(1, 0, 0), z_dir=(0, 1, 0)).offset(BOSS_EXTRUDE33_START)):
        with BuildLine():
            Line((-0.6, 3.724048479), (0.6, 3.724048479))
            Line((0.6, 3.724048479), (0.6, 5.938338623))
            ThreePointArc((0.6, 5.938338623), (0, 6), (-0.6, 5.938338623))
            Line((-0.6, 5.938338623), (-0.6, 3.724048479))
        make_face()
    extrude(amount=BOSS_EXTRUDE33_DEPTH)

    # Sketch42 → Boss-Extrude36 (add)
    with BuildSketch(Plane.XZ.offset(-2.5)):
        Polygon((0.6, -12.012795022), (0.6, -13.908363861), (-0.6, -12.012795022), (-0.6, -3.724048479), (0.6, -3.724048479), align=None)
    extrude(amount=BOSS_EXTRUDE36_DEPTH)

    # Chamfer5
    # the kernel refuses this chamfer: 2.7, 2.2 mm, written as the material it adds along each edge
    with BuildSketch(Plane(origin=(13.45, 8.5, -8.25), x_dir=(0, 0, 1), z_dir=(-1, 0, 0))) as chamfer5_piece_1_section:
        Polygon((CHAMFER5_SIZE, 0), (0, -CHAMFER5_SIZE_2), (0, 0), align=None)
    chamfer5_piece_1 = extrude(amount=26.9, mode=Mode.PRIVATE)
    chamfer5_piece_1 = split(chamfer5_piece_1, bisect_by=Plane(origin=(13.45, 8.450170436, -8.203492517), z_dir=(0, -0.7310560786244812, 0.6823173820929644)), keep=Keep.TOP, mode=Mode.PRIVATE)
    chamfer5_piece_1 = chamfer5_piece_1 - Plane(origin=(-12.21310403, 8.5, -6.709558041), x_dir=(0, 0, 1), z_dir=(0, 1, 0)) * Cylinder(0.7, 65, mode=Mode.PRIVATE)
    add(chamfer5_piece_1)

    # Chamfer6
    chamfer6_edges = [part.edges().sort_by_distance(p)[0] for p in [
        (0, 5.7, -6),
    ]]
    chamfer6_side = [part.faces().sort_by_distance(p)[0] for p in [
        (0, 7.1, -6),
    ]]
    chamfer(chamfer6_edges, length=CHAMFER6_SIZE, length2=CHAMFER6_SIZE2, reference=chamfer6_side[0])


solid = part.part
